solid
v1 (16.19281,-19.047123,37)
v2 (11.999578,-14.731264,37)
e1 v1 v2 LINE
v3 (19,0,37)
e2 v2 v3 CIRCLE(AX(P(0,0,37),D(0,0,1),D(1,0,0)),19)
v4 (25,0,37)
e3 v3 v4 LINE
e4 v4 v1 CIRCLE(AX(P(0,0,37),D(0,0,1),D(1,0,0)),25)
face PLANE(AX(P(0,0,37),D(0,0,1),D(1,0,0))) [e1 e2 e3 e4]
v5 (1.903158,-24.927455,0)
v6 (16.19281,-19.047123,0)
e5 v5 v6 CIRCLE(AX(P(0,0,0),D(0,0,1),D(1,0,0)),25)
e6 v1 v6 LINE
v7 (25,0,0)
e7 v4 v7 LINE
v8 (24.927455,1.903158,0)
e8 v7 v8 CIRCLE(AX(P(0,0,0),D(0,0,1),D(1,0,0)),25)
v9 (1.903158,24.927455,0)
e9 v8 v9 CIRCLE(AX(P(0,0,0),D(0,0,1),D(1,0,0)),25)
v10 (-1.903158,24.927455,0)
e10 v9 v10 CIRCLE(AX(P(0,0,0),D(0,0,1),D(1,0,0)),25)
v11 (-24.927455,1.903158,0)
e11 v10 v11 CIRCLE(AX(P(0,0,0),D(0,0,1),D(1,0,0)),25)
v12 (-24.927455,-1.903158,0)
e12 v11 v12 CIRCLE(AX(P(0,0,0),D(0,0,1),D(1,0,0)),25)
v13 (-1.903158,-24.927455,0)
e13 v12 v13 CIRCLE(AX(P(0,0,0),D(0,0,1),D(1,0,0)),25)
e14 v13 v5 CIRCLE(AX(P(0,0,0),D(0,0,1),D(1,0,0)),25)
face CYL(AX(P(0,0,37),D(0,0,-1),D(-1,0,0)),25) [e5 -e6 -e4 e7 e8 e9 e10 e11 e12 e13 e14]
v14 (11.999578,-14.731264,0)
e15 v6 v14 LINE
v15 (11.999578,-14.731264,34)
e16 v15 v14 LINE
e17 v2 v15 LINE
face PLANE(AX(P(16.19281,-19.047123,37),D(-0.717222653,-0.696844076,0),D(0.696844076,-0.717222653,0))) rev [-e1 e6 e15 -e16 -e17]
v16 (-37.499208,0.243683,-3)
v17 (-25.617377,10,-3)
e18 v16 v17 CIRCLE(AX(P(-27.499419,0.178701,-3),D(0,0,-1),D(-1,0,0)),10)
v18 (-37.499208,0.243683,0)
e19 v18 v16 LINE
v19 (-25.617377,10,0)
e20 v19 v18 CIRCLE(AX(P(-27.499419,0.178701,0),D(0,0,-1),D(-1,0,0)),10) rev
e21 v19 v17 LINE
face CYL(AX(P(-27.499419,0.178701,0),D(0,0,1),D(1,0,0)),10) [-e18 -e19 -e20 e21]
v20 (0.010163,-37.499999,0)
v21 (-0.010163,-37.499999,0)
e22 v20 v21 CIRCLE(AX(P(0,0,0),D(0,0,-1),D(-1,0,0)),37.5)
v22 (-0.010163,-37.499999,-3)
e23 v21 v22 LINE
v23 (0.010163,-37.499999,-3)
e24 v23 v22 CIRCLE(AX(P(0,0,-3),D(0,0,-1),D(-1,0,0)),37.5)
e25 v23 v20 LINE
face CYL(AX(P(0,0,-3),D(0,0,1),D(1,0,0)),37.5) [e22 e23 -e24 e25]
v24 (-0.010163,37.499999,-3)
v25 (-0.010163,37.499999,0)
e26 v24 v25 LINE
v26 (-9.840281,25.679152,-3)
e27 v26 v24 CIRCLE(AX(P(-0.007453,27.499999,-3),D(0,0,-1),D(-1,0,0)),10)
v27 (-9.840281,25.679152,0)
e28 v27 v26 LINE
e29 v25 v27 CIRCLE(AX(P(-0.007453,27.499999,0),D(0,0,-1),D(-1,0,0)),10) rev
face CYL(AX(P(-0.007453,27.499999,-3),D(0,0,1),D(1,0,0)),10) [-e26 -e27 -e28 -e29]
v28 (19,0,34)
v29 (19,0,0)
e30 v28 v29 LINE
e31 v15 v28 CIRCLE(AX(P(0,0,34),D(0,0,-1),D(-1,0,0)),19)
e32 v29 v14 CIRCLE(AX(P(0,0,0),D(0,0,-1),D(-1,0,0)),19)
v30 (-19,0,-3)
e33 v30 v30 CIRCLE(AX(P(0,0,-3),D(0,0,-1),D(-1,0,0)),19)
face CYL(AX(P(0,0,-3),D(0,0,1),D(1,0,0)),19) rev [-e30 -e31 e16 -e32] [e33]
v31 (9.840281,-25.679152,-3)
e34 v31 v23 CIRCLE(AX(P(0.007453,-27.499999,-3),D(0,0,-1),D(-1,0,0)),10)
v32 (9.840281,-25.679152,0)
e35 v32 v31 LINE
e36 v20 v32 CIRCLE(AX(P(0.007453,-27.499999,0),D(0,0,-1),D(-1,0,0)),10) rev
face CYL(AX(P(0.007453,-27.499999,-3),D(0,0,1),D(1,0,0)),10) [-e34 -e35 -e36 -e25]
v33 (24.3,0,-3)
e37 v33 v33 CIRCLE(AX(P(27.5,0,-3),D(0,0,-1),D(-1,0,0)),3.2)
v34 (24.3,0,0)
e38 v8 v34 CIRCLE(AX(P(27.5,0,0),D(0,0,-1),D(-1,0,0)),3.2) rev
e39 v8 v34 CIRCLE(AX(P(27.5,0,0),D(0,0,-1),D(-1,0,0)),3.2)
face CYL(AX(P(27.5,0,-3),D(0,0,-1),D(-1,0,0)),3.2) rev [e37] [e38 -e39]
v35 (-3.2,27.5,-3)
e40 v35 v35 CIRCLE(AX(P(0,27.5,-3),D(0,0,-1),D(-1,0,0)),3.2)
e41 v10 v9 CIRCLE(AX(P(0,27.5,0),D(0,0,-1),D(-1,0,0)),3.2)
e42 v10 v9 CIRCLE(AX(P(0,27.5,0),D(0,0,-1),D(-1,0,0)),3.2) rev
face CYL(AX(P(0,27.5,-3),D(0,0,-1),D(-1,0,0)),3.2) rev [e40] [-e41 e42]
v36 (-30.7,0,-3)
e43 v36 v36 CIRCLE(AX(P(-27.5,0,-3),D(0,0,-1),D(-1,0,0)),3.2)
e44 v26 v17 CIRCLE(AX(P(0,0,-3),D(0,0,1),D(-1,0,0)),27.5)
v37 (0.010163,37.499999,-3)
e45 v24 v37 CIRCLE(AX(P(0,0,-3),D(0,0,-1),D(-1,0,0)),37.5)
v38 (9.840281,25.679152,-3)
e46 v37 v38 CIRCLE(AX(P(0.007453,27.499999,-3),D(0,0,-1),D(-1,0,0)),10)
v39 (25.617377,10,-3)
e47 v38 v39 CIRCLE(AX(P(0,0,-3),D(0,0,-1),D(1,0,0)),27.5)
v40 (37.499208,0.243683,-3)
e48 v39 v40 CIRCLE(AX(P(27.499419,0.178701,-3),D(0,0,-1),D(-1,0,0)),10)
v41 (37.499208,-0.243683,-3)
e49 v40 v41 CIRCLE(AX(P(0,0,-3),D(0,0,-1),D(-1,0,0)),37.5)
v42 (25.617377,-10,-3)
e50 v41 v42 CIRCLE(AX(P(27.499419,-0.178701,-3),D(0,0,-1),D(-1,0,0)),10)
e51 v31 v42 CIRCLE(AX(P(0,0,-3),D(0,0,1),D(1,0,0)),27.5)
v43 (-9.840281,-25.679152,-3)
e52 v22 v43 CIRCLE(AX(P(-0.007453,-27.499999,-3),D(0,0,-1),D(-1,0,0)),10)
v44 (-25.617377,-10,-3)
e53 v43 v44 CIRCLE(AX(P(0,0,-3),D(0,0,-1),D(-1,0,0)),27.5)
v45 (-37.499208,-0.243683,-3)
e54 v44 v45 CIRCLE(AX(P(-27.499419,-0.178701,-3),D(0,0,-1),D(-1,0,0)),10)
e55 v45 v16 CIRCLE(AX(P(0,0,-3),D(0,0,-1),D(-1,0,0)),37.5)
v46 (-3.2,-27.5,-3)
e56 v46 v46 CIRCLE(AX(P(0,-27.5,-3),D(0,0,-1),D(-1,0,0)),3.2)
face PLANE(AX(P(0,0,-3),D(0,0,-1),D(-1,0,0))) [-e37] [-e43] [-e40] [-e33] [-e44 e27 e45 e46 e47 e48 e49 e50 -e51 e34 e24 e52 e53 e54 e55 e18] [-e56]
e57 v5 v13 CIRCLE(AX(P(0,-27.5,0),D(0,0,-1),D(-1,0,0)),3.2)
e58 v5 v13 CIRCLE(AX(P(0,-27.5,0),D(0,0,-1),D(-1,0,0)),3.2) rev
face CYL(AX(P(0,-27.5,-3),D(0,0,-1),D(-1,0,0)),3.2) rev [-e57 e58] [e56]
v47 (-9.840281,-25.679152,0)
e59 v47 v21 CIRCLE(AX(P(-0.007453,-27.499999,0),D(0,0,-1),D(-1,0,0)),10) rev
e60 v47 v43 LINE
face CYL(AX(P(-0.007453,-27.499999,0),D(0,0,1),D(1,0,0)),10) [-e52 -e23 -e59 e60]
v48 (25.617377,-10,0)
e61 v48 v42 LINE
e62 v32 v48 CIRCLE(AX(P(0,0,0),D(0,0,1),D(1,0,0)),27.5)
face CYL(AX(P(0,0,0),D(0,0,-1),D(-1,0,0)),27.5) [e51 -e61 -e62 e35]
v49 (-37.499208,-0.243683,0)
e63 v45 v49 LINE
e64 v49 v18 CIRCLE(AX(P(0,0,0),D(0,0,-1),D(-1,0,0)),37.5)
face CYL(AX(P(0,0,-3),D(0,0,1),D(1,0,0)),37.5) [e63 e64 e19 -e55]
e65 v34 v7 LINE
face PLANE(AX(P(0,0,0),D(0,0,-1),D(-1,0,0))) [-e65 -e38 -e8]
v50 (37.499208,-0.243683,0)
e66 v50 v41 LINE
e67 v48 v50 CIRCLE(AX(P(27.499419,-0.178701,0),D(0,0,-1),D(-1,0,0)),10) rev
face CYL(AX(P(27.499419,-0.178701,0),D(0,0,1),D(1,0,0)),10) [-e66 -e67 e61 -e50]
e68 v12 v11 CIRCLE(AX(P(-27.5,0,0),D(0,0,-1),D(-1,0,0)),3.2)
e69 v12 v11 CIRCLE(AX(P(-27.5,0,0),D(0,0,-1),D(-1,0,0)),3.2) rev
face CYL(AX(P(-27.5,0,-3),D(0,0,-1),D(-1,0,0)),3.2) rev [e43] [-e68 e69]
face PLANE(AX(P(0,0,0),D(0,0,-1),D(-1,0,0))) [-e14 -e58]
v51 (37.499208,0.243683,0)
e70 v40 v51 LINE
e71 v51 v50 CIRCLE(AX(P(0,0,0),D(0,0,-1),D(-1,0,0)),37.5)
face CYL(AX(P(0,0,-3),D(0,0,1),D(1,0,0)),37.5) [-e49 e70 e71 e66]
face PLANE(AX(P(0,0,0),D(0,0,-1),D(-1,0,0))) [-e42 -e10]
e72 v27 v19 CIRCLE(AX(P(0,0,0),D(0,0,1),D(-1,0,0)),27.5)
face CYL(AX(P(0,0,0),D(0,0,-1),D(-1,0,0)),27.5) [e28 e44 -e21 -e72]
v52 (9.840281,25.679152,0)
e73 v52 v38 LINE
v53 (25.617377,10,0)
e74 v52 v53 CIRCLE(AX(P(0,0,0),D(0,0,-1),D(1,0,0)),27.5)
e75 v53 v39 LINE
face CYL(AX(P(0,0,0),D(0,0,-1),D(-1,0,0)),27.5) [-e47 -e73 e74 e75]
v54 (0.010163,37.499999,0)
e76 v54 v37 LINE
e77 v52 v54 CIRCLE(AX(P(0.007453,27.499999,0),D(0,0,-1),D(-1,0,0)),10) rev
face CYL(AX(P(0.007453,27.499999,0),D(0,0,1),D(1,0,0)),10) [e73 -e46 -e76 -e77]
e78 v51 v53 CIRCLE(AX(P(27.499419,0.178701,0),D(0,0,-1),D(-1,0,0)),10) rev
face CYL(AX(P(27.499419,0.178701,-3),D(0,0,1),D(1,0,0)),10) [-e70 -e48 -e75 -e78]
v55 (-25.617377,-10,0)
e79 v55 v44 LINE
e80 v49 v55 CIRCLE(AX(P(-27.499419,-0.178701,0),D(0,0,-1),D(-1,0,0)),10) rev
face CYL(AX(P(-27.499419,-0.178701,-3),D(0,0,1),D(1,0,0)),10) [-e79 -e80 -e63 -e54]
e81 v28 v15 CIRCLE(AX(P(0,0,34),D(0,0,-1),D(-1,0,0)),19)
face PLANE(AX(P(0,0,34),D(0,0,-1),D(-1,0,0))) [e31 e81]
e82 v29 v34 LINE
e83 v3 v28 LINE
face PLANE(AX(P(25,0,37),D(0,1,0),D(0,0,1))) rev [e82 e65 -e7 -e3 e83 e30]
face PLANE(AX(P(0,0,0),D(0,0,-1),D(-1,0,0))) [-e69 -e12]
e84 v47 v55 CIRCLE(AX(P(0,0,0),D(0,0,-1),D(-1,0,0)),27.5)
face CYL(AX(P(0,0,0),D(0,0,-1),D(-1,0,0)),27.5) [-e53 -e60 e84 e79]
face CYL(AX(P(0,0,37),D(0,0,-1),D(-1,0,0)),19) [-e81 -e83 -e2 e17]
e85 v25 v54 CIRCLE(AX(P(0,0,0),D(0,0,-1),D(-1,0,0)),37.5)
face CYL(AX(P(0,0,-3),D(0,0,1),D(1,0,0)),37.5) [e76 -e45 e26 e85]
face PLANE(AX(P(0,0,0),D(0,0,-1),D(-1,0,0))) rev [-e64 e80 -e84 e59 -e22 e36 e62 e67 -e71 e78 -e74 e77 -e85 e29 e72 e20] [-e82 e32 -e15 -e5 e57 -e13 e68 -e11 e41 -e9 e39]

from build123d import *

# Parameters (mm, degrees)
ESQUISSE1_R                  = 25
BOSS_EXTRU_1_DEPTH           = 37
ENL_V_MAT_EXTRU_1_DEPTH      = 3
ENL_V_MAT_EXTRU_1_DEPTH_BACK = 34
ESQUISSE4_R                  = 19
ENL_V_MAT_EXTRU_3_DEPTH      = 52.176166328
ESQUISSE9_R                  = 37.5
BOSS_EXTRU_2_DEPTH           = 3
ENL_V_START                  = 3
ESQUISSE4_2_R                = 19
ENL_V_MAT_EXTRU_4_DEPTH      = 3
D_GAGEMENT_M61_D             = 6.4
D_GAGEMENT_M61_DEPTH         = 3
ENL_V_START_2                = -3
ENL_V_MAT_EXTRU_5_DEPTH      = 3
CONG_1_R                     = 10
CONG_1_OF_SYM_TRIE4_R        = 10
SYM_TRIE5_START              = -3
SYM_TRIE5_DEPTH              = 3


# Read off the part's stored shape, not the designer's step: Symétrie5
with BuildPart() as part:
    # Esquisse1 → Boss.-Extru.1 (new body)
    with BuildSketch(Plane.XY):
        Circle(ESQUISSE1_R)
    extrude(amount=BOSS_EXTRU_1_DEPTH)

    # Esquisse4 → Enlèv. mat.-Extru.1 (cut, two sides: drawn at the far end of the back side and taken through both)
    with BuildSketch(Plane(origin=(0, 0, 0), x_dir=(-1, 0, 0), z_dir=(0, 0, -1)).offset(-ENL_V_MAT_EXTRU_1_DEPTH_BACK)):
        with Locations(Location((0, 0, 0), (0, 0, 180))):
            Circle(ESQUISSE4_R)
    extrude(amount=ENL_V_MAT_EXTRU_1_DEPTH + ENL_V_MAT_EXTRU_1_DEPTH_BACK, mode=Mode.SUBTRACT)

    # Esquisse7 → Enlèv. mat.-Extru.3 (cut, through all)
    with BuildSketch(Plane(origin=(0, 0, 0), x_dir=(-1, 0, 0), z_dir=(0, 0, -1))):
        with BuildLine():
            Line((-16.192810305, -19.047122996), (-11.999578126, -14.731263517))
            ThreePointArc((-11.999578126, -14.731263517), (-17.160885531, -8.154998946), (-19, 0))
            Line((-19, 0), (-25, 0))
            ThreePointArc((-25, 0), (-22.69163125, -10.492372048), (-16.192810305, -19.047122996))
        make_face()
    extrude(amount=-ENL_V_MAT_EXTRU_3_DEPTH, mode=Mode.SUBTRACT)

    # Esquisse9 → Boss.-Extru.2 (add)
    with BuildSketch(Plane(origin=(0, 0, 0), x_dir=(-1, 0, 0), z_dir=(0, 0, -1))):
        Circle(ESQUISSE9_R)
    extrude(amount=BOSS_EXTRU_2_DEPTH)

    # Esquisse4<2> → Enlèv. mat.-Extru.4 (cut)
    with BuildSketch(Plane(origin=(0, 0, 0), x_dir=(-1, 0, 0), z_dir=(0, 0, -1)).offset(ENL_V_START)):
        with Locations(Location((0, 0, 0), (0, 0, 180))):
            Circle(ESQUISSE4_2_R)
    extrude(amount=-ENL_V_MAT_EXTRU_4_DEPTH, mode=Mode.SUBTRACT)

    # Dégagement M61
    with Locations(Plane(origin=(0, 0, -3), x_dir=(-1, 0, 0), z_dir=(0, 0, -1))):
        with Locations((0, 27.5), (27.5, 0), (0, -27.5), (-27.5, 0)):
            Hole(D_GAGEMENT_M61_D / 2, depth=D_GAGEMENT_M61_DEPTH)

    # Esquisse15 → Enlèv. mat.-Extru.5 (cut)
    with BuildSketch(Plane(origin=(0, 0, -3), x_dir=(-1, 0, 0), z_dir=(0, 0, -1)).offset(ENL_V_START_2)):
        with BuildLine():
            Line((34.932786702, 13.636363636), (25.617376915, 10))
            ThreePointArc((25.617376915, 10), (19.384796538, 19.505887911), (9.840281362, 25.679152297))
            Line((9.840281362, 25.679152297), (12.051640076, 35.51067405))
            ThreePointArc((12.051640076, 35.51067405), (25.913422274, 27.106171734), (34.932786702, 13.636363636))
        make_face()
    enl_v_mat_extru_5 = extrude(amount=ENL_V_MAT_EXTRU_5_DEPTH, mode=Mode.SUBTRACT)

    # Congé1
    # the kernel refuses this fillet: 10 mm, written as the material it takes off along each edge
    with BuildSketch(Plane(origin=(-12.051640076, 35.51067405, 30.511737931), x_dir=(0.9866266204606564, 0.16299666192405335, 0), z_dir=(0, 0, -1))) as cong_1_piece_1:
        with BuildLine():
            CenterArc((10.577402483, 9.866707582), CONG_1_R, 178.889666711, 100.475681696)
            Line((0.579280147, 10.060485169), (0.3793177, 10.064360721))
            ThreePointArc((0.3793177, 10.064360721), (0.089970794, 5.04173949), (-0.199669279, 0.011496906))
            Line((-0.199669279, 0.011496906), (-0.032545854, -0.197334152))
            ThreePointArc((-0.032545854, -0.197334152), (6.102347586, -0.699846569), (12.237241026, -0.197334152))
            Line((12.237241026, -0.197334152), (12.204695172, 0))
        make_face()
    extrude(amount=64.023475862, mode=Mode.SUBTRACT)
    with BuildSketch(Plane(origin=(-34.932786702, 13.636363636, 34.090909091), x_dir=(-0.18820424606330075, -0.9821299108385533, 0), z_dir=(0, 0, -1))) as cong_1_piece_2:
        with BuildLine():
            CenterArc((11.818181818, -9.83332166), CONG_1_R, 79.524318304, 100.475681696)
            Line((1.818181818, -9.83332166), (1.618181818, -9.83332166))
            ThreePointArc((1.618181818, -9.83332166), (0.712424476, -4.953024467), (-0.196666433, -0.036363636))
            Line((-0.196666433, -0.036363636), (-0.036363636, 0.196666433))
            ThreePointArc((-0.036363636, 0.196666433), (6.818181818, 0.825043774), (13.672727273, 0.196666433))
            Line((13.672727273, 0.196666433), (13.636363636, 0))
        make_face()
    extrude(amount=71.181818182, mode=Mode.SUBTRACT)

    # Symétrie4: Enlèv. mat.-Extru.5 across plane
    add(enl_v_mat_extru_5.mirror(Plane(origin=(0, 0, 0), x_dir=(0, 0, 1), z_dir=(1, 0, 0))), mode=Mode.SUBTRACT)

    # Congé1 of Symétrie4
    # the kernel refuses this fillet: 10 mm, written as the material it takes off along each edge
    with BuildSketch(Plane(origin=(12.051640076, 35.51067405, 30.511737931), x_dir=(-0.9866266204606562, 0.1629966619240532, 0), z_dir=(0, 0, -1))) as cong_1_of_sym_trie4_piece_1:
        with BuildLine():
            CenterArc((10.577402483, -9.866707582), CONG_1_OF_SYM_TRIE4_R, 80.634651593, 100.475681696)
            Line((0.579280147, -10.060485169), (0.3793177, -10.064360721))
            ThreePointArc((0.3793177, -10.064360721), (0.089970794, -5.04173949), (-0.199669279, -0.011496906))
            Line((-0.199669279, -0.011496906), (-0.032545854, 0.197334152))
            ThreePointArc((-0.032545854, 0.197334152), (6.102347586, 0.699846569), (12.237241026, 0.197334152))
            Line((12.237241026, 0.197334152), (12.204695172, 0))
        make_face()
    extrude(amount=64.023475862, mode=Mode.SUBTRACT)
    with BuildSketch(Plane(origin=(34.932786702, 13.636363636, 34.090909091), x_dir=(0.18820424606330144, -0.982129910838553, 0), z_dir=(0, 0, -1))) as cong_1_of_sym_trie4_piece_2:
        with BuildLine():
            CenterArc((11.818181818, 9.83332166), CONG_1_OF_SYM_TRIE4_R, 180, 100.475681696)
            Line((1.818181818, 9.83332166), (1.618181818, 9.83332166))
            ThreePointArc((1.618181818, 9.83332166), (0.712424476, 4.953024467), (-0.196666433, 0.036363636))
            Line((-0.196666433, 0.036363636), (-0.036363636, -0.196666433))
            ThreePointArc((-0.036363636, -0.196666433), (6.818181818, -0.825043774), (13.672727273, -0.196666433))
            Line((13.672727273, -0.196666433), (13.636363636, 0))
        make_face()
    extrude(amount=71.181818182, mode=Mode.SUBTRACT)

    # Symétrie5 outline → Symétrie5 (cut)
    with BuildSketch(Plane.XY.offset(SYM_TRIE5_START)):
        with BuildLine():
            ThreePointArc((-0.010162924, -37.499998623), (-7.696247071, -33.893936965), (-9.840281362, -25.679152297))
            ThreePointArc((-9.840281362, -25.679152297), (-19.384796538, -19.505887911), (-25.617376915, -10))
            ThreePointArc((-25.617376915, -10), (-33.845353653, -7.907162456), (-37.499208239, -0.243683034))
            ThreePointArc((-37.499208239, -0.243683034), (-26.433813461, -26.59893806), (-0.010162924, -37.499998623))
        make_face()
        with BuildLine():
            ThreePointArc((9.840281362, -25.679152297), (7.696247071, -33.893936965), (0.010162924, -37.499998623))
            ThreePointArc((0.010162924, -37.499998623), (26.433813461, -26.59893806), (37.499208239, -0.243683034))
            ThreePointArc((37.499208239, -0.243683034), (33.845353653, -7.907162456), (25.617376915, -10))
            ThreePointArc((25.617376915, -10), (19.384796538, -19.505887911), (9.840281362, -25.679152297))
        make_face()
    extrude(amount=SYM_TRIE5_DEPTH, mode=Mode.SUBTRACT)


solid = part.part
